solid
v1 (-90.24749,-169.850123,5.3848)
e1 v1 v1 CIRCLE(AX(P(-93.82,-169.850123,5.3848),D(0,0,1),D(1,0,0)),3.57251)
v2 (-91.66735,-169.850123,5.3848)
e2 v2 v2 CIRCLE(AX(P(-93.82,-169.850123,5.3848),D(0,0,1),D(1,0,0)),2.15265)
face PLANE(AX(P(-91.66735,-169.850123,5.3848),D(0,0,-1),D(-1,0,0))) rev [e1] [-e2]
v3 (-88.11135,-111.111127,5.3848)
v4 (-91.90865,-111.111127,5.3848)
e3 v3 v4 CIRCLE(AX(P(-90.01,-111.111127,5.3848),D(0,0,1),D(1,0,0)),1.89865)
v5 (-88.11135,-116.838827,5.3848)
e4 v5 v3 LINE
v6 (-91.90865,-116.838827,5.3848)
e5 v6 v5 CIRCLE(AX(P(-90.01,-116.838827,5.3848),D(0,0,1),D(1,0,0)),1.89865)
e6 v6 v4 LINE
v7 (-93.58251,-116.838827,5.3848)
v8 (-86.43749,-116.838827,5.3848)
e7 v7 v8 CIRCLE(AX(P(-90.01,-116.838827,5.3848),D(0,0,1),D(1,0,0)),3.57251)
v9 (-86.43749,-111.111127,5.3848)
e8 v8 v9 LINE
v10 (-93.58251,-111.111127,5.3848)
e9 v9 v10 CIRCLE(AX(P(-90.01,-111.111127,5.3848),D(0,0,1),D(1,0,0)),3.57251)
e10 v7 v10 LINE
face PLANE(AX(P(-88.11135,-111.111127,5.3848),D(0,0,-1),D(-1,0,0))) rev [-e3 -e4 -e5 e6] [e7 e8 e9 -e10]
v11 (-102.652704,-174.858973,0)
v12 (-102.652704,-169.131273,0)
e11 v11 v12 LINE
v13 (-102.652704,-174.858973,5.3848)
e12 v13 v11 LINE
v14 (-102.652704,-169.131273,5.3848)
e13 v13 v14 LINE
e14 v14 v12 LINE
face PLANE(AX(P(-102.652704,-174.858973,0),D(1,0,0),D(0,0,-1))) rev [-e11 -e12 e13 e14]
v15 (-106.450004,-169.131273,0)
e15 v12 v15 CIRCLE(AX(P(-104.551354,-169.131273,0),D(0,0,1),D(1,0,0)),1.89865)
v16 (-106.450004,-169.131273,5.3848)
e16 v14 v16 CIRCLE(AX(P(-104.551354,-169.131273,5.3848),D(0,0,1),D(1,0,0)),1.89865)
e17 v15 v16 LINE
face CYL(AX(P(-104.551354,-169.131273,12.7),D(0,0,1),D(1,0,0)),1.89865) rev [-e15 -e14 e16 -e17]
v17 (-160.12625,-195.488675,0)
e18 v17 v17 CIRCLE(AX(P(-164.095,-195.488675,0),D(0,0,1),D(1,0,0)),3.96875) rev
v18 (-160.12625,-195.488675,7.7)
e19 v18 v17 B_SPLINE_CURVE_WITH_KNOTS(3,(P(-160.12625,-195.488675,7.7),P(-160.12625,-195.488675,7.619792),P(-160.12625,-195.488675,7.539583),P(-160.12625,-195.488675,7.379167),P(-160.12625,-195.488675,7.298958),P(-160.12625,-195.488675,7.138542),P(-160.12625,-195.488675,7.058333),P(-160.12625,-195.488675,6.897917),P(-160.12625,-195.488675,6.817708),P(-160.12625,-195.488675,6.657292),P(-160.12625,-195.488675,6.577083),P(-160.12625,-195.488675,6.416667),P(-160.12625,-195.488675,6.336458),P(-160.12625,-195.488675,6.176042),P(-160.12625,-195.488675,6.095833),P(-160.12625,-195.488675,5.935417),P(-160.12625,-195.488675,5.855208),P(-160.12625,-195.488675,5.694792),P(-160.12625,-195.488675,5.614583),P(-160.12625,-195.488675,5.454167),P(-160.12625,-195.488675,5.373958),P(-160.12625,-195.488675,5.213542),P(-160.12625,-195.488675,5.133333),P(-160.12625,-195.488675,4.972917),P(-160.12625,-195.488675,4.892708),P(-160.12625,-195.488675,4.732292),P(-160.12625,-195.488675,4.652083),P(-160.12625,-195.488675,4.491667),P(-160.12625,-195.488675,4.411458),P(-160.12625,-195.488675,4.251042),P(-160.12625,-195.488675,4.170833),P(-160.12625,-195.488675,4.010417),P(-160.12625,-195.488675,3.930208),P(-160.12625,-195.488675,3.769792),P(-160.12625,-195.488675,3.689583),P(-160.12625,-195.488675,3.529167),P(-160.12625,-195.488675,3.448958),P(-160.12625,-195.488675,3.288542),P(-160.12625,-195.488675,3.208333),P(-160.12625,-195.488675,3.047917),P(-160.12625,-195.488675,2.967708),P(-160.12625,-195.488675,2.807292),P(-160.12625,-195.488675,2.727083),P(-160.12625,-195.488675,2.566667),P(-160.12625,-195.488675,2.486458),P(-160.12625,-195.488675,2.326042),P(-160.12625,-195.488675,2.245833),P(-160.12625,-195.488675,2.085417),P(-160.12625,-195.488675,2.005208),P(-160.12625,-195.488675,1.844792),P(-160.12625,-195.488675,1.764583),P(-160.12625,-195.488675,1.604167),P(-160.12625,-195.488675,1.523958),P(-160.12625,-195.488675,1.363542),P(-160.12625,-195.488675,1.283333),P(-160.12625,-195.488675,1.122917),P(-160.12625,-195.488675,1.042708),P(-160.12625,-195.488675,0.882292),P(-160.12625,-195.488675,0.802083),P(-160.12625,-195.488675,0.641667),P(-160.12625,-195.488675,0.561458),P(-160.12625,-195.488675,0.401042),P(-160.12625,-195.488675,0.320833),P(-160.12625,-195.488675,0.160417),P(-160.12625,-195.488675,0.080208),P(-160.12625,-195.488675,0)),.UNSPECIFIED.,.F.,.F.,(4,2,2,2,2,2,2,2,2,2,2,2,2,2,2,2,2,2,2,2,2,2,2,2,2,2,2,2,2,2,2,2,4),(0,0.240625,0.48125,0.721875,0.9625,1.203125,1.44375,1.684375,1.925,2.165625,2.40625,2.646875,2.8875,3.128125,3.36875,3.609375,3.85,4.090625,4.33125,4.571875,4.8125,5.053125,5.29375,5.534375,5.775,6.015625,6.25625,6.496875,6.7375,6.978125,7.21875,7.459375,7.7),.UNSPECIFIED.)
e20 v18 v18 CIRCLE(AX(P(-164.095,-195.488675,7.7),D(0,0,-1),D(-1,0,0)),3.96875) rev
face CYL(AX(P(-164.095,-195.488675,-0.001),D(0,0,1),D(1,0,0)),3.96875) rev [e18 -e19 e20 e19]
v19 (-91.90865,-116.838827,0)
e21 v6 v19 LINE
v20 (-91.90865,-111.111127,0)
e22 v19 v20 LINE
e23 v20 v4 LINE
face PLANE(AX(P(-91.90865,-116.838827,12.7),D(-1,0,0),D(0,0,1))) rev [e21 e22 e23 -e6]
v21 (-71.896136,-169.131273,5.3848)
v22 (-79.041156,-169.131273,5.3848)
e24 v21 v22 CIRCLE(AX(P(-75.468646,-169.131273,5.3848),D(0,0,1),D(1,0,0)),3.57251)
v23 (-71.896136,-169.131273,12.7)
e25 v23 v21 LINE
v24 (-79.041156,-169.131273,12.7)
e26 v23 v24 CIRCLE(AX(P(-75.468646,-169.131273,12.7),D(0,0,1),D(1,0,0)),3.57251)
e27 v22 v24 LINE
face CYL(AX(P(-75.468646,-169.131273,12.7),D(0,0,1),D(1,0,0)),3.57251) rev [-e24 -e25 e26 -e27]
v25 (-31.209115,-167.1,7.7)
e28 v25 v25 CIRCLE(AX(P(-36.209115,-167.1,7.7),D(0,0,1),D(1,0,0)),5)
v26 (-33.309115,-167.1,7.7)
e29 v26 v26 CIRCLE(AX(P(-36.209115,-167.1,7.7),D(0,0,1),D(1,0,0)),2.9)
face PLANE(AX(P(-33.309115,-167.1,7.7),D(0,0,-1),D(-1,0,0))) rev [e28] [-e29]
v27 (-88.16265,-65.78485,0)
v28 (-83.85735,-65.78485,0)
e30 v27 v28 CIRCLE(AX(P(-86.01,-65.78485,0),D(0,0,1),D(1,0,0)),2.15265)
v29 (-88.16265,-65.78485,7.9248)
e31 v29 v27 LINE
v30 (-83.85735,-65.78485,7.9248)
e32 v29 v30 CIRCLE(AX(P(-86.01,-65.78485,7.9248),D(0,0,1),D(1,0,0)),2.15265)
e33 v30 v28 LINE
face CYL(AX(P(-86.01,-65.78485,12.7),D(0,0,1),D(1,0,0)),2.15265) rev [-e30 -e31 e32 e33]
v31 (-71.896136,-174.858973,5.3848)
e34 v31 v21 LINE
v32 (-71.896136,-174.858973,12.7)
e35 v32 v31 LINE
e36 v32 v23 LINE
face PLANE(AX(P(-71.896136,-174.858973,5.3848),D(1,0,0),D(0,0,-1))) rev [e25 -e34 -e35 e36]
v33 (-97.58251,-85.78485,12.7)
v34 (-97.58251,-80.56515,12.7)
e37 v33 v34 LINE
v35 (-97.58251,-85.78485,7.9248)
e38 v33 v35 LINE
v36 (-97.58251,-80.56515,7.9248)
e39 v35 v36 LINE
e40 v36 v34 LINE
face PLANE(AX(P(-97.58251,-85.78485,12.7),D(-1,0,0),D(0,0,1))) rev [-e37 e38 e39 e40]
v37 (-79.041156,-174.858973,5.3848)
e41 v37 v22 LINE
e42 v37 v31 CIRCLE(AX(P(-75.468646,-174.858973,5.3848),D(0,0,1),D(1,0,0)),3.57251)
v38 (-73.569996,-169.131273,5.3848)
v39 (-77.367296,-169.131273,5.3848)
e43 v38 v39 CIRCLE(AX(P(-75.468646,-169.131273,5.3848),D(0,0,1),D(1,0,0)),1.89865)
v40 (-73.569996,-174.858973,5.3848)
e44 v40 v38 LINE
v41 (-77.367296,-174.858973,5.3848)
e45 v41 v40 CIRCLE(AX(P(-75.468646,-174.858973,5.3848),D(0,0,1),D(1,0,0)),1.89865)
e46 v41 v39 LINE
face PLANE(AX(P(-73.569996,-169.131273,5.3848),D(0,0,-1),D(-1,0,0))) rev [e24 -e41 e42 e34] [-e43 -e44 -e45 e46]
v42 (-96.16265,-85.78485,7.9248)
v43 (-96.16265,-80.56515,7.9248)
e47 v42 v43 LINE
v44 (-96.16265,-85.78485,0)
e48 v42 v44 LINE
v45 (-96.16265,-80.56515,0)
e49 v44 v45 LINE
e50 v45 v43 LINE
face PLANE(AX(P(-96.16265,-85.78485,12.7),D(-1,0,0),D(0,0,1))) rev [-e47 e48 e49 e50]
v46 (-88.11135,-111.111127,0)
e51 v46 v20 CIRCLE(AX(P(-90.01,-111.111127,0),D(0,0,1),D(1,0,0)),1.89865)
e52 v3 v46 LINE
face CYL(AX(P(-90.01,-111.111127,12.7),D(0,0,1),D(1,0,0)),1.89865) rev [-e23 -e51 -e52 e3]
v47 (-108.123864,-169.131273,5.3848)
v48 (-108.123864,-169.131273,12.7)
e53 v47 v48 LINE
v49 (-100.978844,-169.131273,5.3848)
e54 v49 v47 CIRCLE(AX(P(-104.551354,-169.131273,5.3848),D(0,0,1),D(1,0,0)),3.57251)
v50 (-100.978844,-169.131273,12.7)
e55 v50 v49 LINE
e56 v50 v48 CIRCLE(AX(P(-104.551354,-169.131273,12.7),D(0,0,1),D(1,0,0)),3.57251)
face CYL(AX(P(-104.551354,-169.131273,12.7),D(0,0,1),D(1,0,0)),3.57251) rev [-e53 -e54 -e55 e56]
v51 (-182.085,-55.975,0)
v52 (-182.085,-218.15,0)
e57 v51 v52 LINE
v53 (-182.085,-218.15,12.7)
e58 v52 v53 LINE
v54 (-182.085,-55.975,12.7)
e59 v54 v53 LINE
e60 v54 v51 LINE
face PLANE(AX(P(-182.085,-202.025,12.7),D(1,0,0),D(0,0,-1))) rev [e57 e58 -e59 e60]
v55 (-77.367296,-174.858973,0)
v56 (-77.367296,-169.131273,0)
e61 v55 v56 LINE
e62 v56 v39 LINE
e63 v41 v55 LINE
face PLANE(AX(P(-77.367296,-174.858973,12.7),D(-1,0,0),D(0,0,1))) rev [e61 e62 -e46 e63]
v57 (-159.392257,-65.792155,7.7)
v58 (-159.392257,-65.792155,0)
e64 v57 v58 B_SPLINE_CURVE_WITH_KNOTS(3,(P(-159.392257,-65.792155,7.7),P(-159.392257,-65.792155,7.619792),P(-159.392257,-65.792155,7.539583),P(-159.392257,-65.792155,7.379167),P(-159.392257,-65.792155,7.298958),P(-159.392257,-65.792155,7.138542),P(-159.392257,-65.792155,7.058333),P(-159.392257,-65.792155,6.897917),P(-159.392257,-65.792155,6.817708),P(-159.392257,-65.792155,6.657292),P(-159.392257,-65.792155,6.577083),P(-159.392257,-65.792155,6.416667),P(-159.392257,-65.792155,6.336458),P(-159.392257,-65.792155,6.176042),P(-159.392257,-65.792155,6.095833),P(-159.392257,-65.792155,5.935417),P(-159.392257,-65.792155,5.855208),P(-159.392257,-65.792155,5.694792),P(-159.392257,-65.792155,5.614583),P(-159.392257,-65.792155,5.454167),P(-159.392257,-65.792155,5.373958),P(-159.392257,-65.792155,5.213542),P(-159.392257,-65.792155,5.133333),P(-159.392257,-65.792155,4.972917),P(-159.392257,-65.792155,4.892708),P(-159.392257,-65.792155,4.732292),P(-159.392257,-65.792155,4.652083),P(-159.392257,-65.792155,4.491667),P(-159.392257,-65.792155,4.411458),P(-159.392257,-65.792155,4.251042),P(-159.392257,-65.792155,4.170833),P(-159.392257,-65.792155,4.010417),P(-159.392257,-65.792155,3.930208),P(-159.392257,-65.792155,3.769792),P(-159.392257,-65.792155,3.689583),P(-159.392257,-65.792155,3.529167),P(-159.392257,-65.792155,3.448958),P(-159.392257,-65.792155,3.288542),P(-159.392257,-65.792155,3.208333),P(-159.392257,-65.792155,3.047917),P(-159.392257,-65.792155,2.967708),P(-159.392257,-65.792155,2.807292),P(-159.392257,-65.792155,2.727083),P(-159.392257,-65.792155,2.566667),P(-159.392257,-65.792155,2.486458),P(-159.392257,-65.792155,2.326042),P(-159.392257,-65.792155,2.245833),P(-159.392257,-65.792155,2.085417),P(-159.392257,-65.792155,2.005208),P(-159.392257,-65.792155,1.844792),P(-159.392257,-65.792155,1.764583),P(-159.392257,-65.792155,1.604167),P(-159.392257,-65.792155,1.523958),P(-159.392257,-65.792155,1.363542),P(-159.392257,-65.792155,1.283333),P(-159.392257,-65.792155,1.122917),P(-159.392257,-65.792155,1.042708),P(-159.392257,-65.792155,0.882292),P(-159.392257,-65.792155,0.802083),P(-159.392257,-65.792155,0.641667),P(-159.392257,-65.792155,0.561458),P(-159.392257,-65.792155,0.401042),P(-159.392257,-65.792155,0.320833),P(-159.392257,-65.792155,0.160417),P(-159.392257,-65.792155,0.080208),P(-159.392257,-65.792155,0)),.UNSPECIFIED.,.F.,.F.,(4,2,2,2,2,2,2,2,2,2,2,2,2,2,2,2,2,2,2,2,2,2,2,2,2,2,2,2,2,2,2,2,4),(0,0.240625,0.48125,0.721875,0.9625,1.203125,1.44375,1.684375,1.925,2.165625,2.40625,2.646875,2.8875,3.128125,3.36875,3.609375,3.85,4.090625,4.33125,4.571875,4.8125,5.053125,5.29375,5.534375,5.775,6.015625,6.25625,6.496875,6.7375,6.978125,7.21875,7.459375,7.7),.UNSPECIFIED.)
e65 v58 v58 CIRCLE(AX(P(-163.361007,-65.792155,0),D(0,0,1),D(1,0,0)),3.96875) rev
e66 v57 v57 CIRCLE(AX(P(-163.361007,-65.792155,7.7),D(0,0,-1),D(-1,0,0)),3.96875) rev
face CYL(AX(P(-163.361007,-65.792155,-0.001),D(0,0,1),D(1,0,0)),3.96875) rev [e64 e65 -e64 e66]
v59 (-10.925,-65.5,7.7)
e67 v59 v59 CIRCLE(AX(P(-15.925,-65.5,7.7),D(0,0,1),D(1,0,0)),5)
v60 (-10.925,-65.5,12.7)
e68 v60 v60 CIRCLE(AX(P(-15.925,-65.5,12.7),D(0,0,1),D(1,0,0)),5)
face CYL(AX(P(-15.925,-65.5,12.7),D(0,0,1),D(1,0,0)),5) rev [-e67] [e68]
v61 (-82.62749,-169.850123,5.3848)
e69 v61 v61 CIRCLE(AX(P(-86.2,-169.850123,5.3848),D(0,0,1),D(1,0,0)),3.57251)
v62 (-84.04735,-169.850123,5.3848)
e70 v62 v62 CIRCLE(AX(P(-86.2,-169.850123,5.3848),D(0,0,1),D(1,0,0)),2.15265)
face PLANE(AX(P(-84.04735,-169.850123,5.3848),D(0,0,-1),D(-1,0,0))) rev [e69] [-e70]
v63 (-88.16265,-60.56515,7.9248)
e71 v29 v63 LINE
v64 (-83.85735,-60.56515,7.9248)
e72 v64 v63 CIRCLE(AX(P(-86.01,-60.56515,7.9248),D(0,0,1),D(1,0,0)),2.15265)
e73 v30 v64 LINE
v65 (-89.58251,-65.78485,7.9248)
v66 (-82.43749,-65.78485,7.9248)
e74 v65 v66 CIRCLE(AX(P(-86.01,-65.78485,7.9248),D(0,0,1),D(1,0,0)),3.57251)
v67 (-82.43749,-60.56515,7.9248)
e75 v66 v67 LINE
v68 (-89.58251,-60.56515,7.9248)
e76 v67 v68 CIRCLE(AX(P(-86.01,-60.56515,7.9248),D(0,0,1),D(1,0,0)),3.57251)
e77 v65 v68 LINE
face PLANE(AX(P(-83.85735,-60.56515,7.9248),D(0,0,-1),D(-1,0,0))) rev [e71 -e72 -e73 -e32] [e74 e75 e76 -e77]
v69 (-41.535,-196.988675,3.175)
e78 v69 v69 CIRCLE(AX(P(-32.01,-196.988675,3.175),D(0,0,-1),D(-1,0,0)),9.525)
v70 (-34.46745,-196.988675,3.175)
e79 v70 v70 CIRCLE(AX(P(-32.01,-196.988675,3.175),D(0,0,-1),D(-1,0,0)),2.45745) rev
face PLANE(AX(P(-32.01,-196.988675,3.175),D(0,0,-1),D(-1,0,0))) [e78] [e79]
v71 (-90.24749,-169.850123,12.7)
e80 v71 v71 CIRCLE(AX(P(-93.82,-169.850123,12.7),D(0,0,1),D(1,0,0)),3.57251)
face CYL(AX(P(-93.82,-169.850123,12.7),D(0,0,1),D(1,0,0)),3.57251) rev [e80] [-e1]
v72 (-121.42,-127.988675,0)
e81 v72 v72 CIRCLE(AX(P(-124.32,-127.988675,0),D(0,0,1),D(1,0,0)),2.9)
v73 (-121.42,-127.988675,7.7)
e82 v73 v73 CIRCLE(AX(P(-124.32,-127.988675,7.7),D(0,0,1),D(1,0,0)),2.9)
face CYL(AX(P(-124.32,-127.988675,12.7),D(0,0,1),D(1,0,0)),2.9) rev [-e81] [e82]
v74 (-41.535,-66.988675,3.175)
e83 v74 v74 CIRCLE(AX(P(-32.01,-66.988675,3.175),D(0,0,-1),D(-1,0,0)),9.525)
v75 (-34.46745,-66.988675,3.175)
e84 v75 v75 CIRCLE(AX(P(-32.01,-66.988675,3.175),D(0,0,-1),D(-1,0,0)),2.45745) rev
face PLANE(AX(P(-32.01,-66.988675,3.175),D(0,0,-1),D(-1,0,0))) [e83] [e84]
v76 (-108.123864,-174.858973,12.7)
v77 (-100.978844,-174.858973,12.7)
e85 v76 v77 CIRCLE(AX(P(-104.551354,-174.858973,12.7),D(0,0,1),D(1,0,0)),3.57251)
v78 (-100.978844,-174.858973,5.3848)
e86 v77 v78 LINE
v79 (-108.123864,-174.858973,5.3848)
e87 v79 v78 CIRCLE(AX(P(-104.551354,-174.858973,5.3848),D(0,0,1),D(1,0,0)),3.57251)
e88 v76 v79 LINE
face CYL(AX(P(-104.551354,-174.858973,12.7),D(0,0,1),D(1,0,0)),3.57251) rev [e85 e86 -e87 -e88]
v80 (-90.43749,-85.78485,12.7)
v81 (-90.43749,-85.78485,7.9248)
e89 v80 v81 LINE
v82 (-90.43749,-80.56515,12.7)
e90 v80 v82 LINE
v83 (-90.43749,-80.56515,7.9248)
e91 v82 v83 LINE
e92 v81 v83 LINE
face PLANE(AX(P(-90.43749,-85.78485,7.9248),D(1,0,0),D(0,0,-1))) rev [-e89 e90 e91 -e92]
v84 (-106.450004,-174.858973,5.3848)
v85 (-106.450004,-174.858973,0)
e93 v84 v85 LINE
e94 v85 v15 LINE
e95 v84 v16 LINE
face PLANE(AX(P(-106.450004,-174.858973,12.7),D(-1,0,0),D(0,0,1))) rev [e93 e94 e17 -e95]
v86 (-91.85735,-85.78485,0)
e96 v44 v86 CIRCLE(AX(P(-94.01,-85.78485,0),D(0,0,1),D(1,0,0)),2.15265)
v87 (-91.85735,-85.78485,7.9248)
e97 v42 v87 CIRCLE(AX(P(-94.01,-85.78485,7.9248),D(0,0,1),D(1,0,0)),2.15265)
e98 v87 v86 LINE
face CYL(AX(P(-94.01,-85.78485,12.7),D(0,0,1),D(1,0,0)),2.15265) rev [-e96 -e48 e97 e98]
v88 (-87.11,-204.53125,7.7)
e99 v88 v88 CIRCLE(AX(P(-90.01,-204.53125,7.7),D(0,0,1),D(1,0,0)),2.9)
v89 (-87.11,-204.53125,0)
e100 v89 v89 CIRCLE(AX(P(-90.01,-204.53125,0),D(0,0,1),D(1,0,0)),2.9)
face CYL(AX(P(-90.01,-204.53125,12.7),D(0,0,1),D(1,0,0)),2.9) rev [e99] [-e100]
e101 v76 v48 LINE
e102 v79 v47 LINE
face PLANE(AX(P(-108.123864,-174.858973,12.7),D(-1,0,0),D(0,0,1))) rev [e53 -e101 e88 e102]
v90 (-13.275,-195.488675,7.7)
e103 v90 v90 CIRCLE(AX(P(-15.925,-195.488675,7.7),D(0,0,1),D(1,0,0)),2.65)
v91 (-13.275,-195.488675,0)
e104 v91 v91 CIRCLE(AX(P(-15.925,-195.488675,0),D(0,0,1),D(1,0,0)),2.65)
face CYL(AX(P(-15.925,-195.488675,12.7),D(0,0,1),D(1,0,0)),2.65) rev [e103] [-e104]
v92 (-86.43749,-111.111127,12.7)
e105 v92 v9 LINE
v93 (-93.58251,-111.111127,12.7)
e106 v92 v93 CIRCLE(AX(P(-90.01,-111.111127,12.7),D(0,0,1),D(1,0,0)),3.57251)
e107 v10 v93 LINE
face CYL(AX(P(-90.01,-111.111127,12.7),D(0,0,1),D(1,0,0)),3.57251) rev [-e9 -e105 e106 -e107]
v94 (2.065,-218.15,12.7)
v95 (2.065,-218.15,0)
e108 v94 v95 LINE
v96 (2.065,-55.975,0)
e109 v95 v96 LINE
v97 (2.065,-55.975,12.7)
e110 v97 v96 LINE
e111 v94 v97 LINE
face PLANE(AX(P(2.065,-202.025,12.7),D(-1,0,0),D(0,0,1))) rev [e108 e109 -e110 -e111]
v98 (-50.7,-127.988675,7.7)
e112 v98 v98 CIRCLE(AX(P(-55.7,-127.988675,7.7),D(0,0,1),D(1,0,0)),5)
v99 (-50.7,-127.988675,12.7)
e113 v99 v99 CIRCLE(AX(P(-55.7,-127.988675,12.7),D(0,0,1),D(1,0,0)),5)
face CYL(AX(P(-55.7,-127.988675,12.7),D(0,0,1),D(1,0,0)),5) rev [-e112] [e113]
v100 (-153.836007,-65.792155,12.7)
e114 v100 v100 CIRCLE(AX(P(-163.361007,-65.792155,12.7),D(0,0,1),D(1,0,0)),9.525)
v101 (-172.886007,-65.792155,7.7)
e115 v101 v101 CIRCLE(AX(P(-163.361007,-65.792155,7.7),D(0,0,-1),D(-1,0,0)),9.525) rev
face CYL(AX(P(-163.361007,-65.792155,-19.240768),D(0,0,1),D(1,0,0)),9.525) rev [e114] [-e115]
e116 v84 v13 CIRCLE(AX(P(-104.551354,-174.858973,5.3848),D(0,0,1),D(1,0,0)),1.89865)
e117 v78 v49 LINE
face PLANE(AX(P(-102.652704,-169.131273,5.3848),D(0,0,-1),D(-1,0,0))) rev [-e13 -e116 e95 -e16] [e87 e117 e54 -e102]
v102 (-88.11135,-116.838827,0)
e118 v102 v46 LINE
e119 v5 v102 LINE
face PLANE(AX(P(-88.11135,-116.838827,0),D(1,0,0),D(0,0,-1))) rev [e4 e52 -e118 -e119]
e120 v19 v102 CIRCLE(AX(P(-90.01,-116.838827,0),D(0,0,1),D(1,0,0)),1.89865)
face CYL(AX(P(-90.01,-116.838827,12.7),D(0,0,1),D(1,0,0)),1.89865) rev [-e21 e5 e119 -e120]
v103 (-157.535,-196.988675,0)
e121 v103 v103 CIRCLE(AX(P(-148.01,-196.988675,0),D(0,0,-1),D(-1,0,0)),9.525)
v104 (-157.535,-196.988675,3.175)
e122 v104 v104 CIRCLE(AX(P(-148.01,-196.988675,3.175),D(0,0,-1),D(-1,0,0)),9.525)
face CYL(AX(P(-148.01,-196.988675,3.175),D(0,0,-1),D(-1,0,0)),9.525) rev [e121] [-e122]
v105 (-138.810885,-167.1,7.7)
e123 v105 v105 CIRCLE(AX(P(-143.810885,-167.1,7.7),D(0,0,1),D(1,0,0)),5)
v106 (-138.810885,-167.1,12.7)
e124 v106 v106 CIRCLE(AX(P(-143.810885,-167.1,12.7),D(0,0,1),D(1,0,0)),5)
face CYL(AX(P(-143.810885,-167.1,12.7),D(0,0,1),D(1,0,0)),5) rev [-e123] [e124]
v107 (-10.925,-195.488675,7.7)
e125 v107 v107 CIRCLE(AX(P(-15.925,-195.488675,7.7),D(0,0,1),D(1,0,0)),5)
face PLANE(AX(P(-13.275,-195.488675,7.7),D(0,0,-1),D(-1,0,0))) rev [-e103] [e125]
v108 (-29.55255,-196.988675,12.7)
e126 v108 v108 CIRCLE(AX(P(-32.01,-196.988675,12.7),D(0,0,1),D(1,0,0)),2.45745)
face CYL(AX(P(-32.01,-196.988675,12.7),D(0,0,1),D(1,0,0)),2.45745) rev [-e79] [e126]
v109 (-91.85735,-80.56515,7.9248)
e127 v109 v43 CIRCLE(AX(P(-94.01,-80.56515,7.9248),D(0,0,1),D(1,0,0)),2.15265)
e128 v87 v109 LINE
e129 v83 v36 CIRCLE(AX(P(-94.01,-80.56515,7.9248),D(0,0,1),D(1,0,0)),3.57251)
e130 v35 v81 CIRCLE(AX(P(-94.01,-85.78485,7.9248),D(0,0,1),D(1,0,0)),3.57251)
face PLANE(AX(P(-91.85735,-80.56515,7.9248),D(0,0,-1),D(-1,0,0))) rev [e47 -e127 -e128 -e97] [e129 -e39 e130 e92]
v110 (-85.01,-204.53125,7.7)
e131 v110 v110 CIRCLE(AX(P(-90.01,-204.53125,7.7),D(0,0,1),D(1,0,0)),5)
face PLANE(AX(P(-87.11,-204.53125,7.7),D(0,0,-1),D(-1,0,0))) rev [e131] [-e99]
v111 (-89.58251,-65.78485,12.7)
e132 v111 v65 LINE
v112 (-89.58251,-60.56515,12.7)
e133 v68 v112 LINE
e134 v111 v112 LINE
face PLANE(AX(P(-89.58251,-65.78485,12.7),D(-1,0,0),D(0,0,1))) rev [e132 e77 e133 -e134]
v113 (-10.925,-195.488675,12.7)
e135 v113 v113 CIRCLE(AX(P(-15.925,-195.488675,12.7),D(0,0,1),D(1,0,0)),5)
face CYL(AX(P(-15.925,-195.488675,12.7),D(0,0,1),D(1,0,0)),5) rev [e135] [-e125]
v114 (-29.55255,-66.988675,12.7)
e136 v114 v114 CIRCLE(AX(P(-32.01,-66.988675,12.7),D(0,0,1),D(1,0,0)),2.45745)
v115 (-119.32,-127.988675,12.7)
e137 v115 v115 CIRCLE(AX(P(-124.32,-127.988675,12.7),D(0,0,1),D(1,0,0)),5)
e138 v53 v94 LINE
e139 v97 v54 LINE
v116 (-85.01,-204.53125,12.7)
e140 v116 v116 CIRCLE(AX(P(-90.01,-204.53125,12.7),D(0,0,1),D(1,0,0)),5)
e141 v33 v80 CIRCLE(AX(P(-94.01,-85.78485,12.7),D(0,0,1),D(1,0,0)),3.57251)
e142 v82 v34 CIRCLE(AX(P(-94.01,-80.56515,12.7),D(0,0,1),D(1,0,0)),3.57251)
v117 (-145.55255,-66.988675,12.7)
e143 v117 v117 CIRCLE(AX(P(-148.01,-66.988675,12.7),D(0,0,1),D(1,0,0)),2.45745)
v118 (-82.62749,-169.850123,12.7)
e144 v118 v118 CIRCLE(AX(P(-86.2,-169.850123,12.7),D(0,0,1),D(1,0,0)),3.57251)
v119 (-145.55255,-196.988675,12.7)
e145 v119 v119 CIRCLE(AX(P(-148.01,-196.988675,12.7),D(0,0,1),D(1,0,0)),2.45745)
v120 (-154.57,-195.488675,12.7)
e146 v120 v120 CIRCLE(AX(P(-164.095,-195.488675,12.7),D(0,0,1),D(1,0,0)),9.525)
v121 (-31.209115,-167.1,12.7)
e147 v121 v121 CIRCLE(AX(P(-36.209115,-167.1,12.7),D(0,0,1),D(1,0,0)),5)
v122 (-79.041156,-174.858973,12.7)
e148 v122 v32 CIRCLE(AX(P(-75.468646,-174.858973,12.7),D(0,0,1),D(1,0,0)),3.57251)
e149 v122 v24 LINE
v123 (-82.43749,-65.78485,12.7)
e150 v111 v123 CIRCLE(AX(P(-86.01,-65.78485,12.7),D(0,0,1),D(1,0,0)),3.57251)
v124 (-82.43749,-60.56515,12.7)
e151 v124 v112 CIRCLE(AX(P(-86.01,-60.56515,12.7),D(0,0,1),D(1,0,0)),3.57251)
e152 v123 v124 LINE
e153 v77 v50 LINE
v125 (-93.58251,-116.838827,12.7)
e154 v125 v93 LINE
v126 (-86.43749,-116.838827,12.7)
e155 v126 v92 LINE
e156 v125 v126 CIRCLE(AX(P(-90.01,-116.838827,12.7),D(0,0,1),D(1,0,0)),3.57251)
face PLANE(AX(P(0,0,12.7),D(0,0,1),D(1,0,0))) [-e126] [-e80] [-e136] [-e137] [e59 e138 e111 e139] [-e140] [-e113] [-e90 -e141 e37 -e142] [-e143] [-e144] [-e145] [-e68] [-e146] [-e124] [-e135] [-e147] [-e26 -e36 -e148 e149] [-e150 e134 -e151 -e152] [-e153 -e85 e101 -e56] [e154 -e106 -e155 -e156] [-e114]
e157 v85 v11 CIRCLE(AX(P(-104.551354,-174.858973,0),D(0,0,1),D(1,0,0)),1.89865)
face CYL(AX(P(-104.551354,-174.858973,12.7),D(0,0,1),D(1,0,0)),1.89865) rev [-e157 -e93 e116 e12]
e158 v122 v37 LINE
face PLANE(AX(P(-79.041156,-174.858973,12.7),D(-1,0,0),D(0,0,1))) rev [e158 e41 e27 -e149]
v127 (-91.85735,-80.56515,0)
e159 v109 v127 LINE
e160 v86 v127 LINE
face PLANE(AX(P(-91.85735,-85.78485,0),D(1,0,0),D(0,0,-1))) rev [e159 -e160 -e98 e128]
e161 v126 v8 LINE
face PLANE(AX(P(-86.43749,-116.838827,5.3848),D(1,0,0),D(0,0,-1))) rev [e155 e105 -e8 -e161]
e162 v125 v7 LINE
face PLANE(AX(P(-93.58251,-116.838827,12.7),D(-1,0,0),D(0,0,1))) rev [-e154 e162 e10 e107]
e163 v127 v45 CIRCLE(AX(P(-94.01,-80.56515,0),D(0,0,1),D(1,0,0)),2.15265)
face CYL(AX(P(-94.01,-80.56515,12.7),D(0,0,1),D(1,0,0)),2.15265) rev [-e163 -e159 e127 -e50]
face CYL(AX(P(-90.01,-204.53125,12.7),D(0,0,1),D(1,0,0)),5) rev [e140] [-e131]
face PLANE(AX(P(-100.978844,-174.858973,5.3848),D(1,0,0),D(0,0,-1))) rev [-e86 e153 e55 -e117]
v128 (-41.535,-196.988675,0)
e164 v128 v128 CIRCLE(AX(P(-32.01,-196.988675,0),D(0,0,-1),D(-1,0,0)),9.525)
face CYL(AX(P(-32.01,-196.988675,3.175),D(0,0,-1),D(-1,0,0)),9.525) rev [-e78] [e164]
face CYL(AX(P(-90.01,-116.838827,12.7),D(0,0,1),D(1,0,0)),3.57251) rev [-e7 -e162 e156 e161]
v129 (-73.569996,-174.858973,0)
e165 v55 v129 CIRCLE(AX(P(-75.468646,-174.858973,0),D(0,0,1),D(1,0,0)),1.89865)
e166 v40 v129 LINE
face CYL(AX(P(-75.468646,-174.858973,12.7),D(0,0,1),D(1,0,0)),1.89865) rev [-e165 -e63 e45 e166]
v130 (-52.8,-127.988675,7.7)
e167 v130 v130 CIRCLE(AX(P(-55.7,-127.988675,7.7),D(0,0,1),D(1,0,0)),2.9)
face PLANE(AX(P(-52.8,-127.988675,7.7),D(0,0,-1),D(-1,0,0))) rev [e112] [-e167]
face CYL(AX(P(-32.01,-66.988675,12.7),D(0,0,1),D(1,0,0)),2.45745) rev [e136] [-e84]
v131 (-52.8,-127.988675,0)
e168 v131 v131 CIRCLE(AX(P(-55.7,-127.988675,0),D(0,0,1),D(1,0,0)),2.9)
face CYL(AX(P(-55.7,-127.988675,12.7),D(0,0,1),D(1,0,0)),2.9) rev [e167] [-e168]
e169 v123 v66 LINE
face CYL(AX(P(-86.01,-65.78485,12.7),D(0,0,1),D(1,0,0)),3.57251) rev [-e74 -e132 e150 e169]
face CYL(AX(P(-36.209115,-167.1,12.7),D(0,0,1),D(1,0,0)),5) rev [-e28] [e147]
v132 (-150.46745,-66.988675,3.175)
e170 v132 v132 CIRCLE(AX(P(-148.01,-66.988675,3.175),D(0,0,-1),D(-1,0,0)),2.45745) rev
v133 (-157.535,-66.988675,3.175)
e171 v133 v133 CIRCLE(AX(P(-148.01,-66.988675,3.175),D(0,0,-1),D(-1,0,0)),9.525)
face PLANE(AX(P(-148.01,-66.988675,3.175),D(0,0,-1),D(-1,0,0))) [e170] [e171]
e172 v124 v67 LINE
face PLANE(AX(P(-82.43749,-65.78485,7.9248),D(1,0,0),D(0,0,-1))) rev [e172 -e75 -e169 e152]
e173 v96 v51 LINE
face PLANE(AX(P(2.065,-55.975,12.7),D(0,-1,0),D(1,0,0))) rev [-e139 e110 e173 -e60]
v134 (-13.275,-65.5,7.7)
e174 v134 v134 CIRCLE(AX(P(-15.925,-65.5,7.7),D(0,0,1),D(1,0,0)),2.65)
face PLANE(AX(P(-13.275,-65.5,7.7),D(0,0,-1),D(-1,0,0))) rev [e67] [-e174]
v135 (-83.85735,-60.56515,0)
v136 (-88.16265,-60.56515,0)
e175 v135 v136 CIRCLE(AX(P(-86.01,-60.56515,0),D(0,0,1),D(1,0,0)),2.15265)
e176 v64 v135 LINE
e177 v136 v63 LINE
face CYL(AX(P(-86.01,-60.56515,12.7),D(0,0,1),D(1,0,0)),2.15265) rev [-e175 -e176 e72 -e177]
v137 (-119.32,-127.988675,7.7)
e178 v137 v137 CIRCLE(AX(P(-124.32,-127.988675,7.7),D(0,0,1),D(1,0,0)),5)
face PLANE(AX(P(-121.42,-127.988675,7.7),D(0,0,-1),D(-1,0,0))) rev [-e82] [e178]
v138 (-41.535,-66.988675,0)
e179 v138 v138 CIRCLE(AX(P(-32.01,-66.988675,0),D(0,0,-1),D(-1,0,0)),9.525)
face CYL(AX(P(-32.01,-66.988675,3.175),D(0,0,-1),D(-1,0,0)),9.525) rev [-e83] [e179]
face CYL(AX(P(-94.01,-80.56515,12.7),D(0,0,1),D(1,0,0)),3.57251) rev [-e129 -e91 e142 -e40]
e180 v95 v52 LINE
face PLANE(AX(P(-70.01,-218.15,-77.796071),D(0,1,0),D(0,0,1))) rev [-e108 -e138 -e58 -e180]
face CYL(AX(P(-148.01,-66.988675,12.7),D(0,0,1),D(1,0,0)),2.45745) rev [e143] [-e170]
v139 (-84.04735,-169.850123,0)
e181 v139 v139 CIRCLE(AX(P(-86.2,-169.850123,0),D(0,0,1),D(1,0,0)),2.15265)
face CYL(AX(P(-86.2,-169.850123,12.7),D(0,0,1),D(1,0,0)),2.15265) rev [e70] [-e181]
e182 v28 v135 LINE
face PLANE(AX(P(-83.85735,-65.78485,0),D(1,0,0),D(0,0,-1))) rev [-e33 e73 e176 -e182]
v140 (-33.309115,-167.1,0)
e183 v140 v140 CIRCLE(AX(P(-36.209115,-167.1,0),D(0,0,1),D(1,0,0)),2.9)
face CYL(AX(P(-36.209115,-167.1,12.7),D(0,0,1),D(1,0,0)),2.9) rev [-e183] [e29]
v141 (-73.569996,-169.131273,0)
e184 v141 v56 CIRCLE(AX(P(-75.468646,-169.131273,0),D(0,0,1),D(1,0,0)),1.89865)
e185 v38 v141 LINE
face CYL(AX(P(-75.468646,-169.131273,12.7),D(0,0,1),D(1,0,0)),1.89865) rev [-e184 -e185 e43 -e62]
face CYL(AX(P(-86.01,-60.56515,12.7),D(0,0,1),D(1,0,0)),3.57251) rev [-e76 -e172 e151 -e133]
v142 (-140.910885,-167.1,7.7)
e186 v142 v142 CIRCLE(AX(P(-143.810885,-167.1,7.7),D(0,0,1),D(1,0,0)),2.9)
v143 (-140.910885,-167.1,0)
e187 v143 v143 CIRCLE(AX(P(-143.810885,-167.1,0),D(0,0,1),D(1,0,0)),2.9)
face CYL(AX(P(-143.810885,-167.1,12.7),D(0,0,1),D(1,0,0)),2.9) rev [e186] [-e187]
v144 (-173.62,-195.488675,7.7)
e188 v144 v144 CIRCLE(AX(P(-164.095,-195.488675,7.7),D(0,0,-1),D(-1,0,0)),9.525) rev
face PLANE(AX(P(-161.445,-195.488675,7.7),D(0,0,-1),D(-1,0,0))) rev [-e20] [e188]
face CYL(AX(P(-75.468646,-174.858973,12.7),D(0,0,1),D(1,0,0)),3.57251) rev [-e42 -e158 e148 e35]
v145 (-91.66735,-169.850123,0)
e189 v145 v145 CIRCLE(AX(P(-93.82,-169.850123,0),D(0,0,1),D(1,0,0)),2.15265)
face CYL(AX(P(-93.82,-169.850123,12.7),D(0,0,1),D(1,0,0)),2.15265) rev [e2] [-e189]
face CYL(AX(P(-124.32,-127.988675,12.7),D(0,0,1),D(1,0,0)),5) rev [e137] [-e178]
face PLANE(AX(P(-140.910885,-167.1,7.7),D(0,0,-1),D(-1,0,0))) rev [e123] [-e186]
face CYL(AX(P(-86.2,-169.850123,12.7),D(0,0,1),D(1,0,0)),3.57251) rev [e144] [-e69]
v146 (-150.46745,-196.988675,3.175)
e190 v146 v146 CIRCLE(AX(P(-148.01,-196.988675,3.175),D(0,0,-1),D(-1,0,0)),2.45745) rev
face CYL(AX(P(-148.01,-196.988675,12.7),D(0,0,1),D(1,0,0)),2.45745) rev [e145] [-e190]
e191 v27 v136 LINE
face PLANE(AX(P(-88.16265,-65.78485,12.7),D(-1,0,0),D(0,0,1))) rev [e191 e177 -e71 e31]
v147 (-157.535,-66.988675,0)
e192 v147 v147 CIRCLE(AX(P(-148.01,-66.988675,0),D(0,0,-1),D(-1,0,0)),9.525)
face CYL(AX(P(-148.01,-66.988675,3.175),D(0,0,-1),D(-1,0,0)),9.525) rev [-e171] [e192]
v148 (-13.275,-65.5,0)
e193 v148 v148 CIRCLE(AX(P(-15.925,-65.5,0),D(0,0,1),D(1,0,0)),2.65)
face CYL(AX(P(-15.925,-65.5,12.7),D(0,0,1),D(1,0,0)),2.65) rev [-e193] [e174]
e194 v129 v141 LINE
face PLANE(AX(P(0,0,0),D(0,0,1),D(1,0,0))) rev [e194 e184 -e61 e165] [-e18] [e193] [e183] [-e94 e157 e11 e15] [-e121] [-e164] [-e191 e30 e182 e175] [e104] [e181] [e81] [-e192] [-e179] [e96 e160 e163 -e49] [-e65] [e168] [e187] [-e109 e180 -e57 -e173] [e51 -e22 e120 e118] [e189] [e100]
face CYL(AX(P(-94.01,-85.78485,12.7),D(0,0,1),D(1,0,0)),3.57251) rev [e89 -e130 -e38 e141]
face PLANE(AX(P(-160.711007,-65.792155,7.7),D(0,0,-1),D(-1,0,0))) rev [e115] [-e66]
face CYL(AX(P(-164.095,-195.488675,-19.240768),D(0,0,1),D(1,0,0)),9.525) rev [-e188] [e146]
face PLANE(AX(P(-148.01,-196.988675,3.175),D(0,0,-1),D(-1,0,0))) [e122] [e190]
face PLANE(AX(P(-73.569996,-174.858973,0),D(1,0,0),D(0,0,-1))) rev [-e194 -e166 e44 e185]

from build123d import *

# Parameters (mm, degrees)
SKETCH1_W                                      = 184.15
SKETCH1_H                                      = 146.05
BOSS_EXTRUDE1_DEPTH                            = 12.7
SKETCH5_W                                      = 184.15
SKETCH5_H                                      = 12.7
BOSS_EXTRUDE2_DEPTH                            = 16.125
CBORE_FOR_M5_SHCS2_D                           = 5.8
CBORE_FOR_M5_SHCS2_CBORE_D                     = 10
CBORE_FOR_M5_SHCS2_CBORE_DEPTH                 = 5
CBORE_FOR_M5_SHCS3_D                           = 5.3
CBORE_FOR_M5_SHCS3_CBORE_D                     = 10
CBORE_FOR_M5_SHCS3_CBORE_DEPTH                 = 5
CBORE_START                                    = 5.3848
CBORE_SLOT_FOR_6_SOCKET_HEAD_CAP_SCREW1_DEPTH  = 7.3152
CBORE_SLOT_FOR_6_SOCKET_HEAD_CAP_SC_3_DEPTH    = 5.3848
CBORE_FOR_6_SOCKET_HEAD_CAP_SCREW1_D           = 4.3053
CBORE_FOR_6_SOCKET_HEAD_CAP_SCREW1_CBORE_D     = 7.14502
CBORE_FOR_6_SOCKET_HEAD_CAP_SCREW1_CBORE_DEPTH = 7.3152
F_8_CLEARANCE_HOLE1_D                          = 4.9149
CBORE_SLOT_FOR_6_SOCKET_HEAD_CAP_SCREW2_DEPTH  = 12.7
CBORE_START_2                                  = 7.9248
CBORE_SLOT_FOR_6_SOCKET_HEAD_CAP_SC_5_DEPTH    = 4.7752
SKETCH24_R                                     = 9.525
CUT_EXTRUDE2_DEPTH                             = 3.175
CUT_EXTRUDE3_REACH                             = 286.439
SKETCH25_R                                     = 3.96875
SKETCH26_R                                     = 9.525
CUT_EXTRUDE4_DEPTH                             = 5


# Read off the part's stored shape, not the designer's step: CBORE SLOT for #6 Socket Head Cap Screw1, CBORE SLOT for #6 Socket Head Cap Screw2
with BuildPart() as part:
    # Sketch1 → Boss-Extrude1 (new body)
    with BuildSketch(Plane.XY):
        with Locations((-90.01, -129)):
            Rectangle(SKETCH1_W, SKETCH1_H)
    extrude(amount=BOSS_EXTRUDE1_DEPTH)

    # Sketch5 → Boss-Extrude2 (add)
    with BuildSketch(Plane.XZ.offset(202.025)):
        with Locations((-90.01, 6.35)):
            Rectangle(SKETCH5_W, SKETCH5_H)
    extrude(amount=BOSS_EXTRUDE2_DEPTH)

    # CBORE for M5 SHCS2 (through all)
    with Locations(Plane.XY.offset(12.7)):
        with Locations((-55.7, -127.988675216), (-124.32, -127.988675216), (-90.01, -204.53125), (-143.810885302, -167.1), (-36.209114698, -167.1)):
            CounterBoreHole(CBORE_FOR_M5_SHCS2_D / 2, CBORE_FOR_M5_SHCS2_CBORE_D / 2, CBORE_FOR_M5_SHCS2_CBORE_DEPTH)

    # CBORE for M5 SHCS3 (through all)
    with Locations(Plane.XY.offset(12.7)):
        with Locations((-15.925, -65.5), (-15.925, -195.488675216), (-164.095, -195.488675216), (-163.361007118, -65.792154837)):
            CounterBoreHole(CBORE_FOR_M5_SHCS3_D / 2, CBORE_FOR_M5_SHCS3_CBORE_D / 2, CBORE_FOR_M5_SHCS3_CBORE_DEPTH)

    # CBORE SLOT for _6 Socket Head Cap Sc 2 → CBORE SLOT for #6 Socket Head Cap Screw1 (cut)
    with BuildSketch(Plane.XY.offset(CBORE_START)):
        with BuildLine():
            Line((-71.896135914, -174.858973451), (-71.896135914, -169.131273451))
            ThreePointArc((-71.896135914, -169.131273451), (-75.468645914, -165.558763451), (-79.041155914, -169.131273451))
            Line((-79.041155914, -169.131273451), (-79.041155914, -174.858973451))
            ThreePointArc((-79.041155914, -174.858973451), (-75.468645914, -178.431483451), (-71.896135914, -174.858973451))
        make_face()
        with BuildLine():
            Line((-100.978844086, -174.858973451), (-100.978844086, -169.131273451))
            ThreePointArc((-100.978844086, -169.131273451), (-104.551354086, -165.558763451), (-108.123864086, -169.131273451))
            Line((-108.123864086, -169.131273451), (-108.123864086, -174.858973451))
            ThreePointArc((-108.123864086, -174.858973451), (-104.551354086, -178.431483451), (-100.978844086, -174.858973451))
        make_face()
        with BuildLine():
            Line((-86.43749, -116.838826563), (-86.43749, -111.111126563))
            ThreePointArc((-86.43749, -111.111126563), (-90.01, -107.538616563), (-93.58251, -111.111126563))
            Line((-93.58251, -111.111126563), (-93.58251, -116.838826563))
            ThreePointArc((-93.58251, -116.838826563), (-90.01, -120.411336563), (-86.43749, -116.838826563))
        make_face()
    extrude(amount=CBORE_SLOT_FOR_6_SOCKET_HEAD_CAP_SCREW1_DEPTH, mode=Mode.SUBTRACT)

    # CBORE SLOT for _6 Socket Head Cap Sc 3 o → CBORE SLOT for _6 Socket Head Cap Sc 3 (cut)
    with BuildSketch(Plane.XY):
        with BuildLine():
            Line((-73.569995914, -174.858973451), (-73.569995914, -169.131273451))
            ThreePointArc((-73.569995914, -169.131273451), (-75.468645914, -167.232623451), (-77.367295914, -169.131273451))
            Line((-77.367295914, -169.131273451), (-77.367295914, -174.858973451))
            ThreePointArc((-77.367295914, -174.858973451), (-75.468645914, -176.757623451), (-73.569995914, -174.858973451))
        make_face()
        with BuildLine():
            Line((-102.652704086, -174.858973451), (-102.652704086, -169.131273451))
            ThreePointArc((-102.652704086, -169.131273451), (-104.551354086, -167.232623451), (-106.450004086, -169.131273451))
            Line((-106.450004086, -169.131273451), (-106.450004086, -174.858973451))
            ThreePointArc((-106.450004086, -174.858973451), (-104.551354086, -176.757623451), (-102.652704086, -174.858973451))
        make_face()
        with BuildLine():
            Line((-88.11135, -116.838826563), (-88.11135, -111.111126563))
            ThreePointArc((-88.11135, -111.111126563), (-90.01, -109.212476563), (-91.90865, -111.111126563))
            Line((-91.90865, -111.111126563), (-91.90865, -116.838826563))
            ThreePointArc((-91.90865, -116.838826563), (-90.01, -118.737476563), (-88.11135, -116.838826563))
        make_face()
    extrude(amount=CBORE_SLOT_FOR_6_SOCKET_HEAD_CAP_SC_3_DEPTH, mode=Mode.SUBTRACT)

    # CBORE for #6 Socket Head Cap Screw1 (through all)
    with Locations(Plane.XY.offset(12.7)):
        with Locations((-93.82, -169.850123451), (-86.2, -169.850123451)):
            CounterBoreHole(CBORE_FOR_6_SOCKET_HEAD_CAP_SCREW1_D / 2, CBORE_FOR_6_SOCKET_HEAD_CAP_SCREW1_CBORE_D / 2, CBORE_FOR_6_SOCKET_HEAD_CAP_SCREW1_CBORE_DEPTH)

    # #8 Clearance Hole1 (through all)
    with Locations(Plane.XY.offset(12.7)):
        with Locations((-32.01, -66.988675216), (-148.01, -66.988675216), (-148.01, -196.988675216), (-32.01, -196.988675216)):
            Hole(F_8_CLEARANCE_HOLE1_D / 2)

    # CBORE SLOT for _6 Socket Head Cap Sc 4 → CBORE SLOT for #6 Socket Head Cap Screw2 (cut)
    with BuildSketch(Plane.XY):
        with BuildLine():
            Line((-83.85735, -65.78485), (-83.85735, -60.56515))
            ThreePointArc((-83.85735, -60.56515), (-86.01, -58.4125), (-88.16265, -60.56515))
            Line((-88.16265, -60.56515), (-88.16265, -65.78485))
            ThreePointArc((-88.16265, -65.78485), (-86.01, -67.9375), (-83.85735, -65.78485))
        make_face()
        with BuildLine():
            Line((-91.85735, -85.78485), (-91.85735, -80.56515))
            ThreePointArc((-91.85735, -80.56515), (-94.01, -78.4125), (-96.16265, -80.56515))
            Line((-96.16265, -80.56515), (-96.16265, -85.78485))
            ThreePointArc((-96.16265, -85.78485), (-94.01, -87.9375), (-91.85735, -85.78485))
        make_face()
    extrude(amount=CBORE_SLOT_FOR_6_SOCKET_HEAD_CAP_SCREW2_DEPTH, mode=Mode.SUBTRACT)

    # CBORE SLOT for _6 Socket Head Cap Sc 5 o → CBORE SLOT for _6 Socket Head Cap Sc 5 (cut)
    # profile 1 of 2: a face of its own
    with BuildSketch(Plane.XY.offset(CBORE_START_2)):
        with BuildLine():
            Line((-82.43749, -65.78485), (-82.43749, -60.56515))
            ThreePointArc((-82.43749, -60.56515), (-86.01, -56.99264), (-89.58251, -60.56515))
            Line((-89.58251, -60.56515), (-89.58251, -65.78485))
            ThreePointArc((-89.58251, -65.78485), (-86.01, -69.35736), (-82.43749, -65.78485))
        make_face()
        with BuildLine():
            ThreePointArc((-88.16265, -60.56515), (-86.01, -58.4125), (-83.85735, -60.56515))
            Line((-83.85735, -60.56515), (-83.85735, -65.78485))
            ThreePointArc((-83.85735, -65.78485), (-86.01, -67.9375), (-88.16265, -65.78485))
            Line((-88.16265, -65.78485), (-88.16265, -60.56515))
        make_face(mode=Mode.SUBTRACT)
    # profile 2 of 2: a face of its own
    with BuildSketch(Plane.XY.offset(CBORE_START_2)):
        with BuildLine():
            Line((-90.43749, -85.78485), (-90.43749, -80.56515))
            ThreePointArc((-90.43749, -80.56515), (-94.01, -76.99264), (-97.58251, -80.56515))
            Line((-97.58251, -80.56515), (-97.58251, -85.78485))
            ThreePointArc((-97.58251, -85.78485), (-94.01, -89.35736), (-90.43749, -85.78485))
        make_face()
        with BuildLine():
            ThreePointArc((-96.16265, -80.56515), (-94.01, -78.4125), (-91.85735, -80.56515))
            Line((-91.85735, -80.56515), (-91.85735, -85.78485))
            ThreePointArc((-91.85735, -85.78485), (-94.01, -87.9375), (-96.16265, -85.78485))
            Line((-96.16265, -85.78485), (-96.16265, -80.56515))
        make_face(mode=Mode.SUBTRACT)
    extrude(amount=CBORE_SLOT_FOR_6_SOCKET_HEAD_CAP_SC_5_DEPTH, mode=Mode.SUBTRACT)

    # Sketch24 → Cut-Extrude2 (cut)
    with BuildSketch(Plane(origin=(0, 0, 0), x_dir=(-1, 0, 0), z_dir=(0, 0, -1))):
        with Locations((148.01, -66.988675216)):
            Circle(SKETCH24_R)
        with Locations((32.01, -66.988675216)):
            Circle(SKETCH24_R)
        with Locations((32.01, -196.988675216)):
            Circle(SKETCH24_R)
        with Locations((148.01, -196.988675216)):
            Circle(SKETCH24_R)
    extrude(amount=-CUT_EXTRUDE2_DEPTH, mode=Mode.SUBTRACT)

    # Sketch25 → Cut-Extrude3 (cut, up to next)
    with BuildSketch(Plane.XY.offset(12.7), mode=Mode.PRIVATE) as cut_extrude3_sk1:
        with Locations((-163.361007118, -65.792154837)):
            Circle(SKETCH25_R)
    cut_extrude3_tool1 = extrude(cut_extrude3_sk1.sketch, amount=-CUT_EXTRUDE3_REACH, mode=Mode.PRIVATE) & part.part
    # Sketch25 → Cut-Extrude3 (cut, up to next)
    with BuildSketch(Plane.XY.offset(12.7), mode=Mode.PRIVATE) as cut_extrude3_sk2:
        with Locations((-164.095, -195.488675216)):
            Circle(SKETCH25_R)
    cut_extrude3_tool2 = extrude(cut_extrude3_sk2.sketch, amount=-CUT_EXTRUDE3_REACH, mode=Mode.PRIVATE) & part.part
    add(cut_extrude3_tool1.solids().sort_by_distance((-163.361007, -65.792155, 12.7))[0], mode=Mode.SUBTRACT)
    add(cut_extrude3_tool2.solids().sort_by_distance((-164.095, -195.488675, 12.7))[0], mode=Mode.SUBTRACT)

    # Sketch26 → Cut-Extrude4 (cut)
    with BuildSketch(Plane.XY.offset(12.7)):
        with Locations((-164.095, -195.488675216)):
            Circle(SKETCH26_R)
        with Locations((-163.361007118, -65.792154837)):
            Circle(SKETCH26_R)
    extrude(amount=-CUT_EXTRUDE4_DEPTH, mode=Mode.SUBTRACT)


solid = part.part
